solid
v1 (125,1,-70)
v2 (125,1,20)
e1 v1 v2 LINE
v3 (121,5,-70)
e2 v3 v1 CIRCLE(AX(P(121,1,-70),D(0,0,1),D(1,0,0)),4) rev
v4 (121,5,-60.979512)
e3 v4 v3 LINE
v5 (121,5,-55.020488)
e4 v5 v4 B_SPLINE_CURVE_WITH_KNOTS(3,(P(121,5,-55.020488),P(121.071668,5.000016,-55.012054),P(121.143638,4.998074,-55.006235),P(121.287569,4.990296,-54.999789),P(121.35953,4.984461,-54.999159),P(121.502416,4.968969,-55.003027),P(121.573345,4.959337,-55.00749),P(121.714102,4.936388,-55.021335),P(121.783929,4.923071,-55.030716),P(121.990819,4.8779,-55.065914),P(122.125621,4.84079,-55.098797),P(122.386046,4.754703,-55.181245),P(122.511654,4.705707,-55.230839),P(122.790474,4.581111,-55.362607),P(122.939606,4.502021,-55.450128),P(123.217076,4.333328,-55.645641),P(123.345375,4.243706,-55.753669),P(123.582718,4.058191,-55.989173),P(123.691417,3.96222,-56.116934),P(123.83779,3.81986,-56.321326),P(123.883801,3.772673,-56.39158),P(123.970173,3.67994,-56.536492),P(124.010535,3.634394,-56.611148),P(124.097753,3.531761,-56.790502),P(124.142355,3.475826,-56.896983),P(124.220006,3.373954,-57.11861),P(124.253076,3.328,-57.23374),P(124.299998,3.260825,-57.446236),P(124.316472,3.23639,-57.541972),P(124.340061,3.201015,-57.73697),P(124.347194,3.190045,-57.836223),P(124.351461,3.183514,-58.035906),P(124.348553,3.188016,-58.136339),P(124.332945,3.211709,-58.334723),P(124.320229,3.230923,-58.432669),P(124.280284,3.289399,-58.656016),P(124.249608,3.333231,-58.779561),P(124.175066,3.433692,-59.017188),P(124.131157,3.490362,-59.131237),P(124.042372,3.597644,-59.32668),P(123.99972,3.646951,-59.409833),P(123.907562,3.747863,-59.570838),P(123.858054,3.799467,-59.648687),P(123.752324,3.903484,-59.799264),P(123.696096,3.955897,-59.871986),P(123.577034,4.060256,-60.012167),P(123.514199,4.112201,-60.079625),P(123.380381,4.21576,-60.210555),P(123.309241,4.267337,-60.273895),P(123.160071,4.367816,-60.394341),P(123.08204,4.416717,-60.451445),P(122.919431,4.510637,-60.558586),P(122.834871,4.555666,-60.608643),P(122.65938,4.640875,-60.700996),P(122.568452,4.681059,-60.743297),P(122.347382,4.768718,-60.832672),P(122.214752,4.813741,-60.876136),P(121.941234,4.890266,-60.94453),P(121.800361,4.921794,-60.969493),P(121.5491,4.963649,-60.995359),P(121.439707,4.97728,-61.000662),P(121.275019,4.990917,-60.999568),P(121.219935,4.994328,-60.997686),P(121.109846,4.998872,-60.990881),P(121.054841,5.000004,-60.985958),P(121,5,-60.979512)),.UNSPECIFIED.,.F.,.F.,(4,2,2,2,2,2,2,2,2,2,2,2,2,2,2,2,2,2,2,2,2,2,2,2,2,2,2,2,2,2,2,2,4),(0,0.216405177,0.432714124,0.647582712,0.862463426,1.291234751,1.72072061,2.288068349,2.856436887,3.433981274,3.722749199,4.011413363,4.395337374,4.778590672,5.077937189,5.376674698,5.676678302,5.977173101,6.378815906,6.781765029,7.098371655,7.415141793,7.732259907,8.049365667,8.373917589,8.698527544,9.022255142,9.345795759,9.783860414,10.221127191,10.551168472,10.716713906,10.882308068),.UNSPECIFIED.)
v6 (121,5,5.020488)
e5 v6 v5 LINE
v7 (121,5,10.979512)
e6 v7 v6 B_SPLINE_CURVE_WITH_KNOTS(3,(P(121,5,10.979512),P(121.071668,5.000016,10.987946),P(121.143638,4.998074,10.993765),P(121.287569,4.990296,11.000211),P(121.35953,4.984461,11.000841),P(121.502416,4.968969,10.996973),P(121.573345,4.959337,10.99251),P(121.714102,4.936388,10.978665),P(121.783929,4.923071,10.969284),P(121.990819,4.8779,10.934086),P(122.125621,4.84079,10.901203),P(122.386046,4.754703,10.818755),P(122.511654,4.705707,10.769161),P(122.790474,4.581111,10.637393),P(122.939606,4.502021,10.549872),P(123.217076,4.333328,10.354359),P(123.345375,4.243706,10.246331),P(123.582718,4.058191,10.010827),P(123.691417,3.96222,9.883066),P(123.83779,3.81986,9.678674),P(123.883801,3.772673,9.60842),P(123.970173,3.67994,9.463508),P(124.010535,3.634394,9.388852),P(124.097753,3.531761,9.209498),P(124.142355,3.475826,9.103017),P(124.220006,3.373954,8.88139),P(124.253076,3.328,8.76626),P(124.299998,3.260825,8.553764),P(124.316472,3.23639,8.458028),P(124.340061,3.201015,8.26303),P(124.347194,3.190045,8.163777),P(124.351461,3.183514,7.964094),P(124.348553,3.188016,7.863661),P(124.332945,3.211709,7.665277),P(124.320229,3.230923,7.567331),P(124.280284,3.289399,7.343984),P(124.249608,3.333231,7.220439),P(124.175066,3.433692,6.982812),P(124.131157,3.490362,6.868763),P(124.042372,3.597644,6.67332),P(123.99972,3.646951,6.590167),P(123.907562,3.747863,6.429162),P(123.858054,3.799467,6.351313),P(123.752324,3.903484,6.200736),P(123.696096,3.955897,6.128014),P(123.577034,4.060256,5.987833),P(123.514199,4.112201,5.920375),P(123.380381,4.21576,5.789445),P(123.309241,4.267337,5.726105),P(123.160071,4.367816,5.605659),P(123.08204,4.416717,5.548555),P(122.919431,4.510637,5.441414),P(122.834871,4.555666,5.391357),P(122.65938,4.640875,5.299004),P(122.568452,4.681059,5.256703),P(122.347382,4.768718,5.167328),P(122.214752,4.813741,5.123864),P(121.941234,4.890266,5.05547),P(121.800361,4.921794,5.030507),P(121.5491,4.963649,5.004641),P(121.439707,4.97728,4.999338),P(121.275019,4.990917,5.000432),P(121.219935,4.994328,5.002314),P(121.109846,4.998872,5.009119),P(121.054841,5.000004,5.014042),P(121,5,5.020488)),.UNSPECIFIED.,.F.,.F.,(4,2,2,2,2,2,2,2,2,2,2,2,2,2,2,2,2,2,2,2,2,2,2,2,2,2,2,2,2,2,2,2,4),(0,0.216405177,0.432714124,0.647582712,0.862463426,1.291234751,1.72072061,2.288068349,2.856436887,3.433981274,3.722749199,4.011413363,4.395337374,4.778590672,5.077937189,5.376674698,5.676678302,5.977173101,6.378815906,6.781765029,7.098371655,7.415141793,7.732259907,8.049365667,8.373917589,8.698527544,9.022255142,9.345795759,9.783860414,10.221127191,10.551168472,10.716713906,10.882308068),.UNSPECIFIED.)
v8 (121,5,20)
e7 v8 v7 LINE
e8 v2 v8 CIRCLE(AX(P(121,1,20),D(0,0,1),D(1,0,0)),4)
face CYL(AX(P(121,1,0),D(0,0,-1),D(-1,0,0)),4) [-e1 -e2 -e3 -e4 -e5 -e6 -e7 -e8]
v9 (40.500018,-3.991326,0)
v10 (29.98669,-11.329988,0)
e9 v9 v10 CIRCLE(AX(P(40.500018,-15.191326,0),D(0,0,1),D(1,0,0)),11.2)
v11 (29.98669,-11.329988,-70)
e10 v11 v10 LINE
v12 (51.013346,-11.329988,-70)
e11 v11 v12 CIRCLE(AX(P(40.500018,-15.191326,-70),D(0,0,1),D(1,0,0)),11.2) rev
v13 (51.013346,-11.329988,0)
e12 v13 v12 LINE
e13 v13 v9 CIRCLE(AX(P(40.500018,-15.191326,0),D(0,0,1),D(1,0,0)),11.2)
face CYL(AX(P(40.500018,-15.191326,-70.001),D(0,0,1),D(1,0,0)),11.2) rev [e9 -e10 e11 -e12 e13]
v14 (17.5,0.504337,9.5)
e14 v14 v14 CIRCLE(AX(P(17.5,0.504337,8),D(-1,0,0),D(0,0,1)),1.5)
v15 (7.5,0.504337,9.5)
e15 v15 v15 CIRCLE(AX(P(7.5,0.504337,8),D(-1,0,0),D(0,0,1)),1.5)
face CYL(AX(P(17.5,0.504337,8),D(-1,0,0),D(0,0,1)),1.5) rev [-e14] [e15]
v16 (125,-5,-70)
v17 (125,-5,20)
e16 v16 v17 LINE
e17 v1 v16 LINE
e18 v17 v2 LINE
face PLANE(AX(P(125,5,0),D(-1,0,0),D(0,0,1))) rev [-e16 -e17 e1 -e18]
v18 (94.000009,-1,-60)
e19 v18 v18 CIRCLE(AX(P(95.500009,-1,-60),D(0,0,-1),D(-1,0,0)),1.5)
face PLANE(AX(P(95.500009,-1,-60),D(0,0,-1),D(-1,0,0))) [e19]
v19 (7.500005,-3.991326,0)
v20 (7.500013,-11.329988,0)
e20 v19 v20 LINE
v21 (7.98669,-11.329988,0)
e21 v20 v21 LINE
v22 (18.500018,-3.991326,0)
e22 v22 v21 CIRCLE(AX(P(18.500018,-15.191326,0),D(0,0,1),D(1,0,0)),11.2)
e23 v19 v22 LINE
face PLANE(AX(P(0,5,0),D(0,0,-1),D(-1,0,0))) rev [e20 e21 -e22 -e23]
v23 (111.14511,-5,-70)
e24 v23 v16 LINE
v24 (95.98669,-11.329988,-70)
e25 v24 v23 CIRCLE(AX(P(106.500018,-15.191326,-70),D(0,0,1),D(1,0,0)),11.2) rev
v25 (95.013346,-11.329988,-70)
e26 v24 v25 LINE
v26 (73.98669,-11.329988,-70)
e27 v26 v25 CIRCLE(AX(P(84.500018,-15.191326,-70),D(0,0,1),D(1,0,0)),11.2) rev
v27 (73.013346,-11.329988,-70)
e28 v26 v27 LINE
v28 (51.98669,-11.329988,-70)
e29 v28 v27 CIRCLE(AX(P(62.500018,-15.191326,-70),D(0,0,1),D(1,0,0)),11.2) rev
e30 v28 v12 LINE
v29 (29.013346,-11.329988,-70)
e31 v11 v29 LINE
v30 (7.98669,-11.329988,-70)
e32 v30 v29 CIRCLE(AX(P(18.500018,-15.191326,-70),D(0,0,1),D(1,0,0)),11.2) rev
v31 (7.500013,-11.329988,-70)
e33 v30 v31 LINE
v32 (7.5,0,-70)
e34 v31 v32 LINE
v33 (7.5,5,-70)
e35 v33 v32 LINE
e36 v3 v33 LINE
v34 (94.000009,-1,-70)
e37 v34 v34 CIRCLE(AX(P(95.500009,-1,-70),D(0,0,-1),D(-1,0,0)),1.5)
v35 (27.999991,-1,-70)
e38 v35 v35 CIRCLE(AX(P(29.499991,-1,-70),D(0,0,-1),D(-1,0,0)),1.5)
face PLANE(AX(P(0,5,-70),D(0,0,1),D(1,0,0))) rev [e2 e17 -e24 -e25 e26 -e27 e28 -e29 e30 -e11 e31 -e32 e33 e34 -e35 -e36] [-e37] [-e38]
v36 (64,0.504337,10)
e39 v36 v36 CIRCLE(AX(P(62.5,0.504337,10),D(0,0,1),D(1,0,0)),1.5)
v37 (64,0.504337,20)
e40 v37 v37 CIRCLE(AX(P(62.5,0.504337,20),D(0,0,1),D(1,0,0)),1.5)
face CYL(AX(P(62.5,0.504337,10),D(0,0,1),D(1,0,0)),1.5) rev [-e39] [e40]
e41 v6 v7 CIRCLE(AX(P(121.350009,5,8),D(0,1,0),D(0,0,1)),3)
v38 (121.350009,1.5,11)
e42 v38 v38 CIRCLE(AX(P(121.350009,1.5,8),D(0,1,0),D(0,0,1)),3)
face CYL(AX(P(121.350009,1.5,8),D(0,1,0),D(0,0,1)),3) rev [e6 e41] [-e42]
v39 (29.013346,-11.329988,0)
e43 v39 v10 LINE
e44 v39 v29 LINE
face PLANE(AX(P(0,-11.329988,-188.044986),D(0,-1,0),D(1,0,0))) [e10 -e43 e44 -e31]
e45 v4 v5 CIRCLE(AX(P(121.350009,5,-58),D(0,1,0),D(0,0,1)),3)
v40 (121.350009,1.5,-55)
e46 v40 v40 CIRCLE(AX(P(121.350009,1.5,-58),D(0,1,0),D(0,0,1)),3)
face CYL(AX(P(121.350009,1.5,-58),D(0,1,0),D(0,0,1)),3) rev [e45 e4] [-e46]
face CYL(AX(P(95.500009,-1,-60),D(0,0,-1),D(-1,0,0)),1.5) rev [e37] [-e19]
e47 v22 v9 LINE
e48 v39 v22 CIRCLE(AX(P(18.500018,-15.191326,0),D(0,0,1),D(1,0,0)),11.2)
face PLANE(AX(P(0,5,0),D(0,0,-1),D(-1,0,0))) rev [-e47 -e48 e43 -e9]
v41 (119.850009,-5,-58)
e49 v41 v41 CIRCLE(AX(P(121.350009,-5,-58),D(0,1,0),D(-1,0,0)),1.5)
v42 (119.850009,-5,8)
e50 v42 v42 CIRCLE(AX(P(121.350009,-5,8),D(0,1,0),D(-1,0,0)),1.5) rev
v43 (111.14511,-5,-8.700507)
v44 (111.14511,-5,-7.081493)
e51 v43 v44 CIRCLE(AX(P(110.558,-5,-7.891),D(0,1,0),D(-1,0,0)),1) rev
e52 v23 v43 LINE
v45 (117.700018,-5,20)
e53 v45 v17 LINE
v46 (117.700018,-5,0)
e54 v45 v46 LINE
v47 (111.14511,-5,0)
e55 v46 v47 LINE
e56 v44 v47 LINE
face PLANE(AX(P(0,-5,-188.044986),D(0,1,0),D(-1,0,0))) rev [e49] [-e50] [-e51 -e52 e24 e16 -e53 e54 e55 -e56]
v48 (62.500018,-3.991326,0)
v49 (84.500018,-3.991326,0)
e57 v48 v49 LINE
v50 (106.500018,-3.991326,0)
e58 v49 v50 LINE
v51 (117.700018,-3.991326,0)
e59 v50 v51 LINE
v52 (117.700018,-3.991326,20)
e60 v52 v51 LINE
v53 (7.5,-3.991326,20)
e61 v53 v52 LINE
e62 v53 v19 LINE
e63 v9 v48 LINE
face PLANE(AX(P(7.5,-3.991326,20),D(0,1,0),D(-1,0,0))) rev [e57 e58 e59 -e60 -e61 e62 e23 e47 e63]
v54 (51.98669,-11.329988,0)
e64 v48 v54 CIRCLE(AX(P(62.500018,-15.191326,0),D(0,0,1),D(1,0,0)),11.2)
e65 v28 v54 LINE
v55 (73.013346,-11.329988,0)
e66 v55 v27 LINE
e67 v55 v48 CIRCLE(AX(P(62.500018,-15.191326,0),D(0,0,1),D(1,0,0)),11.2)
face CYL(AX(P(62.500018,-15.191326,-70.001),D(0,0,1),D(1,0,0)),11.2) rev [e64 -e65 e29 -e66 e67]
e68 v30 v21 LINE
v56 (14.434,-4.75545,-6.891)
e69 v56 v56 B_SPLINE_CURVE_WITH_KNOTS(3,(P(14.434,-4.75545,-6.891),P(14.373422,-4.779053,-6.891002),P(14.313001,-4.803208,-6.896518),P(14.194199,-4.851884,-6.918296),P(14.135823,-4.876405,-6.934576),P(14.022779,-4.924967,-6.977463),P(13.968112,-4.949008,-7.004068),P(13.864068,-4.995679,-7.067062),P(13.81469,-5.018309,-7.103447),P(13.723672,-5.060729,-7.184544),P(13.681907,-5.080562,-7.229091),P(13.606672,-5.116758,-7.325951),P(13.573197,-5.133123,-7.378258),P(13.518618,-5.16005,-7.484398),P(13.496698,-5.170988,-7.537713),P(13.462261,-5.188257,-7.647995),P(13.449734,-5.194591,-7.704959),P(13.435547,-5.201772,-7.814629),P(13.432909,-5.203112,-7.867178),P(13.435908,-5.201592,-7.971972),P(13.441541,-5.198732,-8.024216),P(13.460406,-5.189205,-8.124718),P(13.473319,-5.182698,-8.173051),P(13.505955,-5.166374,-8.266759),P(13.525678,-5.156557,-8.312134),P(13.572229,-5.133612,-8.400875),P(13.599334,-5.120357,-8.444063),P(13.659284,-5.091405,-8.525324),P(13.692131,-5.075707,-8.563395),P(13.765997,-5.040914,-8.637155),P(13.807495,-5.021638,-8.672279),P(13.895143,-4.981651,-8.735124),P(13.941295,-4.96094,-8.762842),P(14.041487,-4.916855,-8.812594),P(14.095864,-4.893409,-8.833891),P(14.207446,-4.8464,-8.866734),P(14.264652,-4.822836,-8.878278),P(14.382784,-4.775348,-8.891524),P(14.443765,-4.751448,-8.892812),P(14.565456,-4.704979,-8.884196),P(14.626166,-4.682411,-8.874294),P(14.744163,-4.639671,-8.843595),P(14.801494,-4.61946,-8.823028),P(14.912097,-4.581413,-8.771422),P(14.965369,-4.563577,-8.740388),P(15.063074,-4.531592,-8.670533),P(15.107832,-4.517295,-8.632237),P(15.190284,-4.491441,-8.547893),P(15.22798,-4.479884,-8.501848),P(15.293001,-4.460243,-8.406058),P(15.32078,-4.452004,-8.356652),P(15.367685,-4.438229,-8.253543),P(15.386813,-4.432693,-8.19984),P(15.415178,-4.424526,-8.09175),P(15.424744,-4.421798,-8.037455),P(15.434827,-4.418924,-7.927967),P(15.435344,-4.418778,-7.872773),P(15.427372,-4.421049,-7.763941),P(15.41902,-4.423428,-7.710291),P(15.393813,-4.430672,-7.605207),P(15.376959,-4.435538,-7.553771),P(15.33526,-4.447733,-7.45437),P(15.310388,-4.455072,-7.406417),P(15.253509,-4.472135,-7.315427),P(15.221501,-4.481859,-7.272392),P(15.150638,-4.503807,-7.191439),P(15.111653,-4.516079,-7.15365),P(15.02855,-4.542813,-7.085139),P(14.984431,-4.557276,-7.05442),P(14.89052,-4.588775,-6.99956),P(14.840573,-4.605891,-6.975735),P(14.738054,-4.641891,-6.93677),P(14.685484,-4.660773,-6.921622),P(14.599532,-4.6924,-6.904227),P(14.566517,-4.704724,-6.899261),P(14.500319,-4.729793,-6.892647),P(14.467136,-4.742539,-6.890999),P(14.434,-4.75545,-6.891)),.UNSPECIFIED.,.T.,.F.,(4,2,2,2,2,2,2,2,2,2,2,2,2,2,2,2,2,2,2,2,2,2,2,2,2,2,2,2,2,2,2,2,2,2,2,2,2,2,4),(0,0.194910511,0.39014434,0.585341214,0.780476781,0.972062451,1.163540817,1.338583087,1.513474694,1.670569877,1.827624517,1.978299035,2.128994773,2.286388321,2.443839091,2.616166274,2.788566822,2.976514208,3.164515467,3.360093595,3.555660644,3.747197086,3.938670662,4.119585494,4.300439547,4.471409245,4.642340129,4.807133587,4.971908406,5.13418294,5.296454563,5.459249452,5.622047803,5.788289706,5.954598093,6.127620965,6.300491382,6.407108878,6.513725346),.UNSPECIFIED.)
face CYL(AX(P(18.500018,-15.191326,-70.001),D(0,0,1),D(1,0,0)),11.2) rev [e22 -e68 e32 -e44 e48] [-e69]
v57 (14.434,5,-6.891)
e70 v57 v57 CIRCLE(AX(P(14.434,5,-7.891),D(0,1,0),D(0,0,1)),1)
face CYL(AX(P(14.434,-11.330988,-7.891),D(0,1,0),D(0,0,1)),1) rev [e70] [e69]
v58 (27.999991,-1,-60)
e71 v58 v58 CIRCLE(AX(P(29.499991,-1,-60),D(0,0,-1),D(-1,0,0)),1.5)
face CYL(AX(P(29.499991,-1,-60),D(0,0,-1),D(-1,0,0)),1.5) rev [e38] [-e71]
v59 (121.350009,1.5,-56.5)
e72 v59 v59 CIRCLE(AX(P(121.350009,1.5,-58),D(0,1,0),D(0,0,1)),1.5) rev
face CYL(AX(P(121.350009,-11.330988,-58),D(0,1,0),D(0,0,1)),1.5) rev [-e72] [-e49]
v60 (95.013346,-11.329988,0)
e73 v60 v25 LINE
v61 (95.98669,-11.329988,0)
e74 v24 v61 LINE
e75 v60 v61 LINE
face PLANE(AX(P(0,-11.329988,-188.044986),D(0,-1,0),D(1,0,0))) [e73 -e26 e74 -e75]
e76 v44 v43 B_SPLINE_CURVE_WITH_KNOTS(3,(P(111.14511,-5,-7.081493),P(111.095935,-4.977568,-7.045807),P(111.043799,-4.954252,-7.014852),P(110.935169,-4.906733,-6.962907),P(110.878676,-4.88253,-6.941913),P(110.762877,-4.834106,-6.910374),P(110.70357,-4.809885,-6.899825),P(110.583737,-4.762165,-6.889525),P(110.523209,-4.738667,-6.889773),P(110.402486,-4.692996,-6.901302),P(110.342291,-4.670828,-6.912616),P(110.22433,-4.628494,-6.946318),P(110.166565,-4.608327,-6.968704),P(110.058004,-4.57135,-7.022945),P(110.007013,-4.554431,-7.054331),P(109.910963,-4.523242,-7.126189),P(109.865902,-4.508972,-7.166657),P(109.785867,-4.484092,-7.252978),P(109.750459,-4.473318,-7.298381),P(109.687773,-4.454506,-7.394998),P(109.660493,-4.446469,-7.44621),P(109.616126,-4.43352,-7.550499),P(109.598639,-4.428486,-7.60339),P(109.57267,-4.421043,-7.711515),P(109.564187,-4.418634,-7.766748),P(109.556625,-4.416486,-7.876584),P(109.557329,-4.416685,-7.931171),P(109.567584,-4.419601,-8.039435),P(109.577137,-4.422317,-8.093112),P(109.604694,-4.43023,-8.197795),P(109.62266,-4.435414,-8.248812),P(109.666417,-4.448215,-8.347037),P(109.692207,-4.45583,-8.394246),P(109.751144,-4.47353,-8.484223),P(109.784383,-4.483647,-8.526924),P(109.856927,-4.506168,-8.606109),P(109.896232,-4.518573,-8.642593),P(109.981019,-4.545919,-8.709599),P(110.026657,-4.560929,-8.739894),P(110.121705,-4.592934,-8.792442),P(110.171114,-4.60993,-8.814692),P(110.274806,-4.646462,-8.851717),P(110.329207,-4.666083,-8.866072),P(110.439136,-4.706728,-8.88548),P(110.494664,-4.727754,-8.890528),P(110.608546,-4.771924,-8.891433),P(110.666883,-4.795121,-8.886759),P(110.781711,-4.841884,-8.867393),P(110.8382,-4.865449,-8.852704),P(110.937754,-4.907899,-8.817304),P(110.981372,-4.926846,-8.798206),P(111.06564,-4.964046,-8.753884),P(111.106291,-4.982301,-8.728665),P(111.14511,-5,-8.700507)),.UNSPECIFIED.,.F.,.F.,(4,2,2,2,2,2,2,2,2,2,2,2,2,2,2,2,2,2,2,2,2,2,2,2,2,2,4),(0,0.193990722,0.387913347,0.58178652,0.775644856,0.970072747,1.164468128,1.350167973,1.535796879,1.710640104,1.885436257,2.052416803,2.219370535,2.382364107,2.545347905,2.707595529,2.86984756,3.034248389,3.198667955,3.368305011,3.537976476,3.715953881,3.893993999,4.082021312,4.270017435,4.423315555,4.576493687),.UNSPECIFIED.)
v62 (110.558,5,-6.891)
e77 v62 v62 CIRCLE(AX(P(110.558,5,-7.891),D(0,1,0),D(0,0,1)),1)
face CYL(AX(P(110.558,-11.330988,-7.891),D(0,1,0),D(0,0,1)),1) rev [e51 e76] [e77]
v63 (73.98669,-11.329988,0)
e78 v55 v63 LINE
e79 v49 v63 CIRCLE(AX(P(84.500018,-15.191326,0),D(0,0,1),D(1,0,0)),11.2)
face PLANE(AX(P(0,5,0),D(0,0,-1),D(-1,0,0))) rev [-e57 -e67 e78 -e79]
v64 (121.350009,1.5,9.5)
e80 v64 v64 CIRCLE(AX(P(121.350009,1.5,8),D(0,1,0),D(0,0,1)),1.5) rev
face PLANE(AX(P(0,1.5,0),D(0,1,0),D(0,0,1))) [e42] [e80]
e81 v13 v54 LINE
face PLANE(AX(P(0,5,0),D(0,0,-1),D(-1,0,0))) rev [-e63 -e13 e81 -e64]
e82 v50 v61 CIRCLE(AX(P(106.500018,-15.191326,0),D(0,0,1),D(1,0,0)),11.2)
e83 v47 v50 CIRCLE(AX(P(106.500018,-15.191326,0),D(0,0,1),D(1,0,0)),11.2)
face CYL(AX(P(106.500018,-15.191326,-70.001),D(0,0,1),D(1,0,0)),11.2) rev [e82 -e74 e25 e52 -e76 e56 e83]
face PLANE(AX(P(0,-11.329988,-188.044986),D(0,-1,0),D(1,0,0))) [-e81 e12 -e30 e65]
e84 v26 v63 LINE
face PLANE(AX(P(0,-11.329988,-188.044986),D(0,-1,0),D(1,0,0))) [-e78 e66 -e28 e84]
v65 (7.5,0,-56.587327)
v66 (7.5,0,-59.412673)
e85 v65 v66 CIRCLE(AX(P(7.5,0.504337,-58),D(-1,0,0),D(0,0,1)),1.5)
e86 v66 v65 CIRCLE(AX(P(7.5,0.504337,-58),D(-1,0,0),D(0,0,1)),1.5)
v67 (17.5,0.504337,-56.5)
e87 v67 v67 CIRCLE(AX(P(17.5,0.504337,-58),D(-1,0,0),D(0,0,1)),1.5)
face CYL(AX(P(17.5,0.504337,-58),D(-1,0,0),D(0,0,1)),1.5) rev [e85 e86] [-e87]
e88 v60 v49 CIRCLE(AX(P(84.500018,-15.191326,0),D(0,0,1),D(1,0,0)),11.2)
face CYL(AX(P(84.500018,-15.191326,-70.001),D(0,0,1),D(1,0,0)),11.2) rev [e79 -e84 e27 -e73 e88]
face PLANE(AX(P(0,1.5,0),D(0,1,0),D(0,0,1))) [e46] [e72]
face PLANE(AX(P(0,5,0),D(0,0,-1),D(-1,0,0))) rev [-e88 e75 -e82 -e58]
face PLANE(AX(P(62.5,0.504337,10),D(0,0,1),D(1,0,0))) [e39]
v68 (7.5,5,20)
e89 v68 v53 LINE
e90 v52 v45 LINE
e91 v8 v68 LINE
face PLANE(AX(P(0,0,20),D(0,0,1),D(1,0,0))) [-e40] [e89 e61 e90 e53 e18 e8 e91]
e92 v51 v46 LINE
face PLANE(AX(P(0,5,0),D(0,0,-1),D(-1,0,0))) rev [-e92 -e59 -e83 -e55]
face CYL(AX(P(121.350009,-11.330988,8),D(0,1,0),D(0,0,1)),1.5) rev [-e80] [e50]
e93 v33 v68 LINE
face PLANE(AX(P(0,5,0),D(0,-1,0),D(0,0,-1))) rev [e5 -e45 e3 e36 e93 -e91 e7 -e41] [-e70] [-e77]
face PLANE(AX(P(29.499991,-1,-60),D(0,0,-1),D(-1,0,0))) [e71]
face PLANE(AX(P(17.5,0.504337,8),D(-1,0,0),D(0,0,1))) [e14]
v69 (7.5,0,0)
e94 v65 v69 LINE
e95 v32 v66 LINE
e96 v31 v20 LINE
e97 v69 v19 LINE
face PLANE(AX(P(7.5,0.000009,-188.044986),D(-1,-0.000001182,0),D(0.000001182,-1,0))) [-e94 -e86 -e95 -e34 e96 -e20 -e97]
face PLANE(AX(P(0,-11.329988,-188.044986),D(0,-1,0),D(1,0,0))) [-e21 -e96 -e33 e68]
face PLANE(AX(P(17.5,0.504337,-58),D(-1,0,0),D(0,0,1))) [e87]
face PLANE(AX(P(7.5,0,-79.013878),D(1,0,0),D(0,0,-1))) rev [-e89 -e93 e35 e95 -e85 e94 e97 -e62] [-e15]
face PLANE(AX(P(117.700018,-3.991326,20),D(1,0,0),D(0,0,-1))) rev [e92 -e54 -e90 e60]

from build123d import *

# Parameters (mm, degrees)
SKETCH_1_W          = 125
SKETCH_1_H          = 70
EXTRUDE_1_DEPTH     = 5
SKETCH_2_W          = 7.5
SKETCH_2_H          = 5
CUT_EXTRUDE_1_DEPTH = 70
EXTRUDE_START       = -70
EXTRUDE_2_DEPTH     = 70
CUT_EXTRUDE_2_REACH = 145.713
SKETCH_5_R          = 11.2
EXTRUDE_3_DEPTH     = 20
SKETCH_7_R          = 1.5
CUT_EXTRUDE_3_DEPTH = 10
CUT_EXTRUDE_4_REACH = 146.193
SKETCH_8_R          = 1.5
SKETCH_9_R          = 3
SKETCH_9_R_2        = 1.5
CUT_EXTRUDE_5_DEPTH = 3.5
SKETCH_11_R         = 1.5
CUT_EXTRUDE_6_DEPTH = 10
CUT_EXTRUDE_7_REACH = 146.193
SKETCH_12_R         = 1
FILLET_1_R          = 4
SKETCH_14_R         = 1.5
CUT_EXTRUDE_8_DEPTH = 10


# Read off the part's stored shape, not the designer's step: 凸台-拉伸2
with BuildPart() as part:
    # 草图1 → 凸台-拉伸1 (new body)
    with BuildSketch(Plane(origin=(0, 0, 0), x_dir=(1, 0, 0), z_dir=(0, 1, 0))):
        with Locations((62.5, 35)):
            Rectangle(SKETCH_1_W, SKETCH_1_H)
    extrude(amount=EXTRUDE_1_DEPTH)

    # 草图2 → 切除-拉伸1 (cut)
    with BuildSketch(Plane.XY):
        with Locations((3.75, 2.5)):
            Rectangle(SKETCH_2_W, SKETCH_2_H)
    extrude(amount=-CUT_EXTRUDE_1_DEPTH, mode=Mode.SUBTRACT)

    # 凸台-拉伸2 outline → 凸台-拉伸2 (add)
    with BuildSketch(Plane.XY.offset(EXTRUDE_START)):
        with BuildLine():
            Line((125, -5), (125, 0))
            Line((125, 0), (7.5, 0))
            Line((7.5, 0), (7.500013395, -11.329987981))
            Line((7.500013395, -11.329987981), (8.200014526, -11.329987981))
            ThreePointArc((8.200014526, -11.329987981), (18.500017961, -4.191325734), (28.800021395, -11.329987981))
            Line((28.800021395, -11.329987981), (30.200014526, -11.329987981))
            ThreePointArc((30.200014526, -11.329987981), (40.500017961, -4.191325734), (50.800021395, -11.329987981))
            Line((50.800021395, -11.329987981), (52.200014526, -11.329987981))
            ThreePointArc((52.200014526, -11.329987981), (62.500017961, -4.191325734), (72.800021395, -11.329987981))
            Line((72.800021395, -11.329987981), (74.200014526, -11.329987981))
            ThreePointArc((74.200014526, -11.329987981), (84.500017961, -4.191325734), (94.800021395, -11.329987981))
            Line((94.800021395, -11.329987981), (96.200014526, -11.329987981))
            ThreePointArc((96.200014526, -11.329987981), (102.083615638, -5.116833662), (110.639689418, -5))
            Line((110.639689418, -5), (125, -5))
        make_face()
    extrude(amount=EXTRUDE_2_DEPTH)

    # 草图5 → 切除-拉伸2 (cut, up to next)
    with BuildSketch(Plane.XY, mode=Mode.PRIVATE) as cut_extrude_2_sk1:
        with Locations((18.500017961, -15.191325734)):
            Circle(SKETCH_5_R)
    cut_extrude_2_tool1 = extrude(cut_extrude_2_sk1.sketch, amount=-CUT_EXTRUDE_2_REACH, mode=Mode.PRIVATE) & part.part
    # 草图5 → 切除-拉伸2 (cut, up to next)
    with BuildSketch(Plane.XY, mode=Mode.PRIVATE) as cut_extrude_2_sk2:
        with Locations((40.500017961, -15.191325734)):
            Circle(SKETCH_5_R)
    cut_extrude_2_tool2 = extrude(cut_extrude_2_sk2.sketch, amount=-CUT_EXTRUDE_2_REACH, mode=Mode.PRIVATE) & part.part
    # 草图5 → 切除-拉伸2 (cut, up to next)
    with BuildSketch(Plane.XY, mode=Mode.PRIVATE) as cut_extrude_2_sk3:
        with Locations((62.500017961, -15.191325734)):
            Circle(SKETCH_5_R)
    cut_extrude_2_tool3 = extrude(cut_extrude_2_sk3.sketch, amount=-CUT_EXTRUDE_2_REACH, mode=Mode.PRIVATE) & part.part
    # 草图5 → 切除-拉伸2 (cut, up to next)
    with BuildSketch(Plane.XY, mode=Mode.PRIVATE) as cut_extrude_2_sk4:
        with Locations((84.500017961, -15.191325734)):
            Circle(SKETCH_5_R)
    cut_extrude_2_tool4 = extrude(cut_extrude_2_sk4.sketch, amount=-CUT_EXTRUDE_2_REACH, mode=Mode.PRIVATE) & part.part
    # 草图5 → 切除-拉伸2 (cut, up to next)
    with BuildSketch(Plane.XY, mode=Mode.PRIVATE) as cut_extrude_2_sk5:
        with Locations((106.500017961, -15.191325734)):
            Circle(SKETCH_5_R)
    cut_extrude_2_tool5 = extrude(cut_extrude_2_sk5.sketch, amount=-CUT_EXTRUDE_2_REACH, mode=Mode.PRIVATE) & part.part
    add(cut_extrude_2_tool1.solids().sort_by_distance((18.500018, -15.191326, 0))[0], mode=Mode.SUBTRACT)
    add(cut_extrude_2_tool2.solids().sort_by_distance((40.500018, -15.191326, 0))[0], mode=Mode.SUBTRACT)
    add(cut_extrude_2_tool3.solids().sort_by_distance((62.500018, -15.191326, 0))[0], mode=Mode.SUBTRACT)
    add(cut_extrude_2_tool4.solids().sort_by_distance((84.500018, -15.191326, 0))[0], mode=Mode.SUBTRACT)
    add(cut_extrude_2_tool5.solids().sort_by_distance((106.500018, -15.191326, 0))[0], mode=Mode.SUBTRACT)

    # 草图6 → 凸台-拉伸3 (add)
    with BuildSketch(Plane.XY):
        Polygon((7.5, 5), (125, 5), (125, -3.991325734), (125, -5), (117.700017961, -5), (117.700017961, -3.991325734), (7.5, -3.991325734), align=None)
    extrude(amount=EXTRUDE_3_DEPTH)

    # 草图7 → 切除-拉伸3 (cut)
    with BuildSketch(Plane(origin=(0, 0, -70), x_dir=(-1, 0, 0), z_dir=(0, 0, -1))):
        with Locations((-29.49999102, -1)):
            Circle(SKETCH_7_R)
        with Locations((-95.50000898, -1)):
            Circle(SKETCH_7_R)
    extrude(amount=-CUT_EXTRUDE_3_DEPTH, mode=Mode.SUBTRACT)

    # 草图8 → 切除-拉伸4 (cut, up to next)
    with BuildSketch(Plane(origin=(0, 5, 0), x_dir=(1, 0, 0), z_dir=(0, 1, 0)), mode=Mode.PRIVATE) as cut_extrude_4_sk1:
        with Locations(Location((121.35000898, 58, 0), (0, 0, 270))):
            Circle(SKETCH_8_R)
    cut_extrude_4_tool1 = extrude(cut_extrude_4_sk1.sketch, amount=-CUT_EXTRUDE_4_REACH, mode=Mode.PRIVATE) & part.part
    # 草图8 → 切除-拉伸4 (cut, up to next)
    with BuildSketch(Plane(origin=(0, 5, 0), x_dir=(1, 0, 0), z_dir=(0, 1, 0)), mode=Mode.PRIVATE) as cut_extrude_4_sk2:
        with Locations(Location((121.35000898, -8, 0), (0, 0, 270))):
            Circle(SKETCH_8_R)
    cut_extrude_4_tool2 = extrude(cut_extrude_4_sk2.sketch, amount=-CUT_EXTRUDE_4_REACH, mode=Mode.PRIVATE) & part.part
    add(cut_extrude_4_tool1.solids().sort_by_distance((121.350009, 5, -58))[0], mode=Mode.SUBTRACT)
    add(cut_extrude_4_tool2.solids().sort_by_distance((121.350009, 5, 8))[0], mode=Mode.SUBTRACT)

    # 草图9 → 切除-拉伸5 (cut)
    # profile 1 of 2: a face of its own
    with BuildSketch(Plane(origin=(0, 5, 0), x_dir=(1, 0, 0), z_dir=(0, 1, 0))):
        with Locations(Location((121.35000898, 58, 0), (0, 0, 270))):
            Circle(SKETCH_9_R)
        with Locations(Location((121.35000898, 58, 0), (0, 0, 270))):
            Circle(SKETCH_9_R_2, mode=Mode.SUBTRACT)
    # profile 2 of 2: a face of its own
    with BuildSketch(Plane(origin=(0, 5, 0), x_dir=(1, 0, 0), z_dir=(0, 1, 0))):
        with Locations(Location((121.35000898, -8, 0), (0, 0, 270))):
            Circle(SKETCH_9_R)
        with Locations(Location((121.35000898, -8, 0), (0, 0, 270))):
            Circle(SKETCH_9_R_2, mode=Mode.SUBTRACT)
    extrude(amount=-CUT_EXTRUDE_5_DEPTH, mode=Mode.SUBTRACT)

    # 草图11 → 切除-拉伸6 (cut)
    with BuildSketch(Plane.ZY.offset(-7.5)):
        with Locations((8, 0.504337133)):
            Circle(SKETCH_11_R)
        with Locations((-58, 0.504337133)):
            Circle(SKETCH_11_R)
    extrude(amount=-CUT_EXTRUDE_6_DEPTH, mode=Mode.SUBTRACT)

    # 草图12 → 切除-拉伸7 (cut, up to next)
    with BuildSketch(Plane(origin=(0, 5, 0), x_dir=(1, 0, 0), z_dir=(0, 1, 0)), mode=Mode.PRIVATE) as cut_extrude_7_sk1:
        with Locations(Location((110.558, 7.891, 0), (0, 0, 270))):
            Circle(SKETCH_12_R)
    cut_extrude_7_tool1 = extrude(cut_extrude_7_sk1.sketch, amount=-CUT_EXTRUDE_7_REACH, mode=Mode.PRIVATE) & part.part
    # 草图12 → 切除-拉伸7 (cut, up to next)
    with BuildSketch(Plane(origin=(0, 5, 0), x_dir=(1, 0, 0), z_dir=(0, 1, 0)), mode=Mode.PRIVATE) as cut_extrude_7_sk2:
        with Locations(Location((14.434, 7.891, 0), (0, 0, 270))):
            Circle(SKETCH_12_R)
    cut_extrude_7_tool2 = extrude(cut_extrude_7_sk2.sketch, amount=-CUT_EXTRUDE_7_REACH, mode=Mode.PRIVATE) & part.part
    add(cut_extrude_7_tool1.solids().sort_by_distance((110.558, 5, -7.891))[0], mode=Mode.SUBTRACT)
    add(cut_extrude_7_tool2.solids().sort_by_distance((14.434, 5, -7.891))[0], mode=Mode.SUBTRACT)

    # 圆角1
    # the kernel refuses this fillet: 4 mm, written as the material it takes off along each edge
    with BuildSketch(Plane(origin=(125, 5, -80), x_dir=(0, -1, 0), z_dir=(0, 0, 1))) as fillet_1_piece_1:
        with BuildLine():
            CenterArc((FILLET_1_R, -FILLET_1_R), FILLET_1_R, 90, 90)
            Line((0, -FILLET_1_R), (0, 0))
            Line((0, 0), (FILLET_1_R, 0))
        make_face()
    extrude(amount=110, mode=Mode.SUBTRACT)

    # 草图14 → 切除-拉伸8 (cut)
    with BuildSketch(Plane.XY.offset(20)):
        with Locations((62.5, 0.504337133)):
            Circle(SKETCH_14_R)
    extrude(amount=-CUT_EXTRUDE_8_DEPTH, mode=Mode.SUBTRACT)


solid = part.part
